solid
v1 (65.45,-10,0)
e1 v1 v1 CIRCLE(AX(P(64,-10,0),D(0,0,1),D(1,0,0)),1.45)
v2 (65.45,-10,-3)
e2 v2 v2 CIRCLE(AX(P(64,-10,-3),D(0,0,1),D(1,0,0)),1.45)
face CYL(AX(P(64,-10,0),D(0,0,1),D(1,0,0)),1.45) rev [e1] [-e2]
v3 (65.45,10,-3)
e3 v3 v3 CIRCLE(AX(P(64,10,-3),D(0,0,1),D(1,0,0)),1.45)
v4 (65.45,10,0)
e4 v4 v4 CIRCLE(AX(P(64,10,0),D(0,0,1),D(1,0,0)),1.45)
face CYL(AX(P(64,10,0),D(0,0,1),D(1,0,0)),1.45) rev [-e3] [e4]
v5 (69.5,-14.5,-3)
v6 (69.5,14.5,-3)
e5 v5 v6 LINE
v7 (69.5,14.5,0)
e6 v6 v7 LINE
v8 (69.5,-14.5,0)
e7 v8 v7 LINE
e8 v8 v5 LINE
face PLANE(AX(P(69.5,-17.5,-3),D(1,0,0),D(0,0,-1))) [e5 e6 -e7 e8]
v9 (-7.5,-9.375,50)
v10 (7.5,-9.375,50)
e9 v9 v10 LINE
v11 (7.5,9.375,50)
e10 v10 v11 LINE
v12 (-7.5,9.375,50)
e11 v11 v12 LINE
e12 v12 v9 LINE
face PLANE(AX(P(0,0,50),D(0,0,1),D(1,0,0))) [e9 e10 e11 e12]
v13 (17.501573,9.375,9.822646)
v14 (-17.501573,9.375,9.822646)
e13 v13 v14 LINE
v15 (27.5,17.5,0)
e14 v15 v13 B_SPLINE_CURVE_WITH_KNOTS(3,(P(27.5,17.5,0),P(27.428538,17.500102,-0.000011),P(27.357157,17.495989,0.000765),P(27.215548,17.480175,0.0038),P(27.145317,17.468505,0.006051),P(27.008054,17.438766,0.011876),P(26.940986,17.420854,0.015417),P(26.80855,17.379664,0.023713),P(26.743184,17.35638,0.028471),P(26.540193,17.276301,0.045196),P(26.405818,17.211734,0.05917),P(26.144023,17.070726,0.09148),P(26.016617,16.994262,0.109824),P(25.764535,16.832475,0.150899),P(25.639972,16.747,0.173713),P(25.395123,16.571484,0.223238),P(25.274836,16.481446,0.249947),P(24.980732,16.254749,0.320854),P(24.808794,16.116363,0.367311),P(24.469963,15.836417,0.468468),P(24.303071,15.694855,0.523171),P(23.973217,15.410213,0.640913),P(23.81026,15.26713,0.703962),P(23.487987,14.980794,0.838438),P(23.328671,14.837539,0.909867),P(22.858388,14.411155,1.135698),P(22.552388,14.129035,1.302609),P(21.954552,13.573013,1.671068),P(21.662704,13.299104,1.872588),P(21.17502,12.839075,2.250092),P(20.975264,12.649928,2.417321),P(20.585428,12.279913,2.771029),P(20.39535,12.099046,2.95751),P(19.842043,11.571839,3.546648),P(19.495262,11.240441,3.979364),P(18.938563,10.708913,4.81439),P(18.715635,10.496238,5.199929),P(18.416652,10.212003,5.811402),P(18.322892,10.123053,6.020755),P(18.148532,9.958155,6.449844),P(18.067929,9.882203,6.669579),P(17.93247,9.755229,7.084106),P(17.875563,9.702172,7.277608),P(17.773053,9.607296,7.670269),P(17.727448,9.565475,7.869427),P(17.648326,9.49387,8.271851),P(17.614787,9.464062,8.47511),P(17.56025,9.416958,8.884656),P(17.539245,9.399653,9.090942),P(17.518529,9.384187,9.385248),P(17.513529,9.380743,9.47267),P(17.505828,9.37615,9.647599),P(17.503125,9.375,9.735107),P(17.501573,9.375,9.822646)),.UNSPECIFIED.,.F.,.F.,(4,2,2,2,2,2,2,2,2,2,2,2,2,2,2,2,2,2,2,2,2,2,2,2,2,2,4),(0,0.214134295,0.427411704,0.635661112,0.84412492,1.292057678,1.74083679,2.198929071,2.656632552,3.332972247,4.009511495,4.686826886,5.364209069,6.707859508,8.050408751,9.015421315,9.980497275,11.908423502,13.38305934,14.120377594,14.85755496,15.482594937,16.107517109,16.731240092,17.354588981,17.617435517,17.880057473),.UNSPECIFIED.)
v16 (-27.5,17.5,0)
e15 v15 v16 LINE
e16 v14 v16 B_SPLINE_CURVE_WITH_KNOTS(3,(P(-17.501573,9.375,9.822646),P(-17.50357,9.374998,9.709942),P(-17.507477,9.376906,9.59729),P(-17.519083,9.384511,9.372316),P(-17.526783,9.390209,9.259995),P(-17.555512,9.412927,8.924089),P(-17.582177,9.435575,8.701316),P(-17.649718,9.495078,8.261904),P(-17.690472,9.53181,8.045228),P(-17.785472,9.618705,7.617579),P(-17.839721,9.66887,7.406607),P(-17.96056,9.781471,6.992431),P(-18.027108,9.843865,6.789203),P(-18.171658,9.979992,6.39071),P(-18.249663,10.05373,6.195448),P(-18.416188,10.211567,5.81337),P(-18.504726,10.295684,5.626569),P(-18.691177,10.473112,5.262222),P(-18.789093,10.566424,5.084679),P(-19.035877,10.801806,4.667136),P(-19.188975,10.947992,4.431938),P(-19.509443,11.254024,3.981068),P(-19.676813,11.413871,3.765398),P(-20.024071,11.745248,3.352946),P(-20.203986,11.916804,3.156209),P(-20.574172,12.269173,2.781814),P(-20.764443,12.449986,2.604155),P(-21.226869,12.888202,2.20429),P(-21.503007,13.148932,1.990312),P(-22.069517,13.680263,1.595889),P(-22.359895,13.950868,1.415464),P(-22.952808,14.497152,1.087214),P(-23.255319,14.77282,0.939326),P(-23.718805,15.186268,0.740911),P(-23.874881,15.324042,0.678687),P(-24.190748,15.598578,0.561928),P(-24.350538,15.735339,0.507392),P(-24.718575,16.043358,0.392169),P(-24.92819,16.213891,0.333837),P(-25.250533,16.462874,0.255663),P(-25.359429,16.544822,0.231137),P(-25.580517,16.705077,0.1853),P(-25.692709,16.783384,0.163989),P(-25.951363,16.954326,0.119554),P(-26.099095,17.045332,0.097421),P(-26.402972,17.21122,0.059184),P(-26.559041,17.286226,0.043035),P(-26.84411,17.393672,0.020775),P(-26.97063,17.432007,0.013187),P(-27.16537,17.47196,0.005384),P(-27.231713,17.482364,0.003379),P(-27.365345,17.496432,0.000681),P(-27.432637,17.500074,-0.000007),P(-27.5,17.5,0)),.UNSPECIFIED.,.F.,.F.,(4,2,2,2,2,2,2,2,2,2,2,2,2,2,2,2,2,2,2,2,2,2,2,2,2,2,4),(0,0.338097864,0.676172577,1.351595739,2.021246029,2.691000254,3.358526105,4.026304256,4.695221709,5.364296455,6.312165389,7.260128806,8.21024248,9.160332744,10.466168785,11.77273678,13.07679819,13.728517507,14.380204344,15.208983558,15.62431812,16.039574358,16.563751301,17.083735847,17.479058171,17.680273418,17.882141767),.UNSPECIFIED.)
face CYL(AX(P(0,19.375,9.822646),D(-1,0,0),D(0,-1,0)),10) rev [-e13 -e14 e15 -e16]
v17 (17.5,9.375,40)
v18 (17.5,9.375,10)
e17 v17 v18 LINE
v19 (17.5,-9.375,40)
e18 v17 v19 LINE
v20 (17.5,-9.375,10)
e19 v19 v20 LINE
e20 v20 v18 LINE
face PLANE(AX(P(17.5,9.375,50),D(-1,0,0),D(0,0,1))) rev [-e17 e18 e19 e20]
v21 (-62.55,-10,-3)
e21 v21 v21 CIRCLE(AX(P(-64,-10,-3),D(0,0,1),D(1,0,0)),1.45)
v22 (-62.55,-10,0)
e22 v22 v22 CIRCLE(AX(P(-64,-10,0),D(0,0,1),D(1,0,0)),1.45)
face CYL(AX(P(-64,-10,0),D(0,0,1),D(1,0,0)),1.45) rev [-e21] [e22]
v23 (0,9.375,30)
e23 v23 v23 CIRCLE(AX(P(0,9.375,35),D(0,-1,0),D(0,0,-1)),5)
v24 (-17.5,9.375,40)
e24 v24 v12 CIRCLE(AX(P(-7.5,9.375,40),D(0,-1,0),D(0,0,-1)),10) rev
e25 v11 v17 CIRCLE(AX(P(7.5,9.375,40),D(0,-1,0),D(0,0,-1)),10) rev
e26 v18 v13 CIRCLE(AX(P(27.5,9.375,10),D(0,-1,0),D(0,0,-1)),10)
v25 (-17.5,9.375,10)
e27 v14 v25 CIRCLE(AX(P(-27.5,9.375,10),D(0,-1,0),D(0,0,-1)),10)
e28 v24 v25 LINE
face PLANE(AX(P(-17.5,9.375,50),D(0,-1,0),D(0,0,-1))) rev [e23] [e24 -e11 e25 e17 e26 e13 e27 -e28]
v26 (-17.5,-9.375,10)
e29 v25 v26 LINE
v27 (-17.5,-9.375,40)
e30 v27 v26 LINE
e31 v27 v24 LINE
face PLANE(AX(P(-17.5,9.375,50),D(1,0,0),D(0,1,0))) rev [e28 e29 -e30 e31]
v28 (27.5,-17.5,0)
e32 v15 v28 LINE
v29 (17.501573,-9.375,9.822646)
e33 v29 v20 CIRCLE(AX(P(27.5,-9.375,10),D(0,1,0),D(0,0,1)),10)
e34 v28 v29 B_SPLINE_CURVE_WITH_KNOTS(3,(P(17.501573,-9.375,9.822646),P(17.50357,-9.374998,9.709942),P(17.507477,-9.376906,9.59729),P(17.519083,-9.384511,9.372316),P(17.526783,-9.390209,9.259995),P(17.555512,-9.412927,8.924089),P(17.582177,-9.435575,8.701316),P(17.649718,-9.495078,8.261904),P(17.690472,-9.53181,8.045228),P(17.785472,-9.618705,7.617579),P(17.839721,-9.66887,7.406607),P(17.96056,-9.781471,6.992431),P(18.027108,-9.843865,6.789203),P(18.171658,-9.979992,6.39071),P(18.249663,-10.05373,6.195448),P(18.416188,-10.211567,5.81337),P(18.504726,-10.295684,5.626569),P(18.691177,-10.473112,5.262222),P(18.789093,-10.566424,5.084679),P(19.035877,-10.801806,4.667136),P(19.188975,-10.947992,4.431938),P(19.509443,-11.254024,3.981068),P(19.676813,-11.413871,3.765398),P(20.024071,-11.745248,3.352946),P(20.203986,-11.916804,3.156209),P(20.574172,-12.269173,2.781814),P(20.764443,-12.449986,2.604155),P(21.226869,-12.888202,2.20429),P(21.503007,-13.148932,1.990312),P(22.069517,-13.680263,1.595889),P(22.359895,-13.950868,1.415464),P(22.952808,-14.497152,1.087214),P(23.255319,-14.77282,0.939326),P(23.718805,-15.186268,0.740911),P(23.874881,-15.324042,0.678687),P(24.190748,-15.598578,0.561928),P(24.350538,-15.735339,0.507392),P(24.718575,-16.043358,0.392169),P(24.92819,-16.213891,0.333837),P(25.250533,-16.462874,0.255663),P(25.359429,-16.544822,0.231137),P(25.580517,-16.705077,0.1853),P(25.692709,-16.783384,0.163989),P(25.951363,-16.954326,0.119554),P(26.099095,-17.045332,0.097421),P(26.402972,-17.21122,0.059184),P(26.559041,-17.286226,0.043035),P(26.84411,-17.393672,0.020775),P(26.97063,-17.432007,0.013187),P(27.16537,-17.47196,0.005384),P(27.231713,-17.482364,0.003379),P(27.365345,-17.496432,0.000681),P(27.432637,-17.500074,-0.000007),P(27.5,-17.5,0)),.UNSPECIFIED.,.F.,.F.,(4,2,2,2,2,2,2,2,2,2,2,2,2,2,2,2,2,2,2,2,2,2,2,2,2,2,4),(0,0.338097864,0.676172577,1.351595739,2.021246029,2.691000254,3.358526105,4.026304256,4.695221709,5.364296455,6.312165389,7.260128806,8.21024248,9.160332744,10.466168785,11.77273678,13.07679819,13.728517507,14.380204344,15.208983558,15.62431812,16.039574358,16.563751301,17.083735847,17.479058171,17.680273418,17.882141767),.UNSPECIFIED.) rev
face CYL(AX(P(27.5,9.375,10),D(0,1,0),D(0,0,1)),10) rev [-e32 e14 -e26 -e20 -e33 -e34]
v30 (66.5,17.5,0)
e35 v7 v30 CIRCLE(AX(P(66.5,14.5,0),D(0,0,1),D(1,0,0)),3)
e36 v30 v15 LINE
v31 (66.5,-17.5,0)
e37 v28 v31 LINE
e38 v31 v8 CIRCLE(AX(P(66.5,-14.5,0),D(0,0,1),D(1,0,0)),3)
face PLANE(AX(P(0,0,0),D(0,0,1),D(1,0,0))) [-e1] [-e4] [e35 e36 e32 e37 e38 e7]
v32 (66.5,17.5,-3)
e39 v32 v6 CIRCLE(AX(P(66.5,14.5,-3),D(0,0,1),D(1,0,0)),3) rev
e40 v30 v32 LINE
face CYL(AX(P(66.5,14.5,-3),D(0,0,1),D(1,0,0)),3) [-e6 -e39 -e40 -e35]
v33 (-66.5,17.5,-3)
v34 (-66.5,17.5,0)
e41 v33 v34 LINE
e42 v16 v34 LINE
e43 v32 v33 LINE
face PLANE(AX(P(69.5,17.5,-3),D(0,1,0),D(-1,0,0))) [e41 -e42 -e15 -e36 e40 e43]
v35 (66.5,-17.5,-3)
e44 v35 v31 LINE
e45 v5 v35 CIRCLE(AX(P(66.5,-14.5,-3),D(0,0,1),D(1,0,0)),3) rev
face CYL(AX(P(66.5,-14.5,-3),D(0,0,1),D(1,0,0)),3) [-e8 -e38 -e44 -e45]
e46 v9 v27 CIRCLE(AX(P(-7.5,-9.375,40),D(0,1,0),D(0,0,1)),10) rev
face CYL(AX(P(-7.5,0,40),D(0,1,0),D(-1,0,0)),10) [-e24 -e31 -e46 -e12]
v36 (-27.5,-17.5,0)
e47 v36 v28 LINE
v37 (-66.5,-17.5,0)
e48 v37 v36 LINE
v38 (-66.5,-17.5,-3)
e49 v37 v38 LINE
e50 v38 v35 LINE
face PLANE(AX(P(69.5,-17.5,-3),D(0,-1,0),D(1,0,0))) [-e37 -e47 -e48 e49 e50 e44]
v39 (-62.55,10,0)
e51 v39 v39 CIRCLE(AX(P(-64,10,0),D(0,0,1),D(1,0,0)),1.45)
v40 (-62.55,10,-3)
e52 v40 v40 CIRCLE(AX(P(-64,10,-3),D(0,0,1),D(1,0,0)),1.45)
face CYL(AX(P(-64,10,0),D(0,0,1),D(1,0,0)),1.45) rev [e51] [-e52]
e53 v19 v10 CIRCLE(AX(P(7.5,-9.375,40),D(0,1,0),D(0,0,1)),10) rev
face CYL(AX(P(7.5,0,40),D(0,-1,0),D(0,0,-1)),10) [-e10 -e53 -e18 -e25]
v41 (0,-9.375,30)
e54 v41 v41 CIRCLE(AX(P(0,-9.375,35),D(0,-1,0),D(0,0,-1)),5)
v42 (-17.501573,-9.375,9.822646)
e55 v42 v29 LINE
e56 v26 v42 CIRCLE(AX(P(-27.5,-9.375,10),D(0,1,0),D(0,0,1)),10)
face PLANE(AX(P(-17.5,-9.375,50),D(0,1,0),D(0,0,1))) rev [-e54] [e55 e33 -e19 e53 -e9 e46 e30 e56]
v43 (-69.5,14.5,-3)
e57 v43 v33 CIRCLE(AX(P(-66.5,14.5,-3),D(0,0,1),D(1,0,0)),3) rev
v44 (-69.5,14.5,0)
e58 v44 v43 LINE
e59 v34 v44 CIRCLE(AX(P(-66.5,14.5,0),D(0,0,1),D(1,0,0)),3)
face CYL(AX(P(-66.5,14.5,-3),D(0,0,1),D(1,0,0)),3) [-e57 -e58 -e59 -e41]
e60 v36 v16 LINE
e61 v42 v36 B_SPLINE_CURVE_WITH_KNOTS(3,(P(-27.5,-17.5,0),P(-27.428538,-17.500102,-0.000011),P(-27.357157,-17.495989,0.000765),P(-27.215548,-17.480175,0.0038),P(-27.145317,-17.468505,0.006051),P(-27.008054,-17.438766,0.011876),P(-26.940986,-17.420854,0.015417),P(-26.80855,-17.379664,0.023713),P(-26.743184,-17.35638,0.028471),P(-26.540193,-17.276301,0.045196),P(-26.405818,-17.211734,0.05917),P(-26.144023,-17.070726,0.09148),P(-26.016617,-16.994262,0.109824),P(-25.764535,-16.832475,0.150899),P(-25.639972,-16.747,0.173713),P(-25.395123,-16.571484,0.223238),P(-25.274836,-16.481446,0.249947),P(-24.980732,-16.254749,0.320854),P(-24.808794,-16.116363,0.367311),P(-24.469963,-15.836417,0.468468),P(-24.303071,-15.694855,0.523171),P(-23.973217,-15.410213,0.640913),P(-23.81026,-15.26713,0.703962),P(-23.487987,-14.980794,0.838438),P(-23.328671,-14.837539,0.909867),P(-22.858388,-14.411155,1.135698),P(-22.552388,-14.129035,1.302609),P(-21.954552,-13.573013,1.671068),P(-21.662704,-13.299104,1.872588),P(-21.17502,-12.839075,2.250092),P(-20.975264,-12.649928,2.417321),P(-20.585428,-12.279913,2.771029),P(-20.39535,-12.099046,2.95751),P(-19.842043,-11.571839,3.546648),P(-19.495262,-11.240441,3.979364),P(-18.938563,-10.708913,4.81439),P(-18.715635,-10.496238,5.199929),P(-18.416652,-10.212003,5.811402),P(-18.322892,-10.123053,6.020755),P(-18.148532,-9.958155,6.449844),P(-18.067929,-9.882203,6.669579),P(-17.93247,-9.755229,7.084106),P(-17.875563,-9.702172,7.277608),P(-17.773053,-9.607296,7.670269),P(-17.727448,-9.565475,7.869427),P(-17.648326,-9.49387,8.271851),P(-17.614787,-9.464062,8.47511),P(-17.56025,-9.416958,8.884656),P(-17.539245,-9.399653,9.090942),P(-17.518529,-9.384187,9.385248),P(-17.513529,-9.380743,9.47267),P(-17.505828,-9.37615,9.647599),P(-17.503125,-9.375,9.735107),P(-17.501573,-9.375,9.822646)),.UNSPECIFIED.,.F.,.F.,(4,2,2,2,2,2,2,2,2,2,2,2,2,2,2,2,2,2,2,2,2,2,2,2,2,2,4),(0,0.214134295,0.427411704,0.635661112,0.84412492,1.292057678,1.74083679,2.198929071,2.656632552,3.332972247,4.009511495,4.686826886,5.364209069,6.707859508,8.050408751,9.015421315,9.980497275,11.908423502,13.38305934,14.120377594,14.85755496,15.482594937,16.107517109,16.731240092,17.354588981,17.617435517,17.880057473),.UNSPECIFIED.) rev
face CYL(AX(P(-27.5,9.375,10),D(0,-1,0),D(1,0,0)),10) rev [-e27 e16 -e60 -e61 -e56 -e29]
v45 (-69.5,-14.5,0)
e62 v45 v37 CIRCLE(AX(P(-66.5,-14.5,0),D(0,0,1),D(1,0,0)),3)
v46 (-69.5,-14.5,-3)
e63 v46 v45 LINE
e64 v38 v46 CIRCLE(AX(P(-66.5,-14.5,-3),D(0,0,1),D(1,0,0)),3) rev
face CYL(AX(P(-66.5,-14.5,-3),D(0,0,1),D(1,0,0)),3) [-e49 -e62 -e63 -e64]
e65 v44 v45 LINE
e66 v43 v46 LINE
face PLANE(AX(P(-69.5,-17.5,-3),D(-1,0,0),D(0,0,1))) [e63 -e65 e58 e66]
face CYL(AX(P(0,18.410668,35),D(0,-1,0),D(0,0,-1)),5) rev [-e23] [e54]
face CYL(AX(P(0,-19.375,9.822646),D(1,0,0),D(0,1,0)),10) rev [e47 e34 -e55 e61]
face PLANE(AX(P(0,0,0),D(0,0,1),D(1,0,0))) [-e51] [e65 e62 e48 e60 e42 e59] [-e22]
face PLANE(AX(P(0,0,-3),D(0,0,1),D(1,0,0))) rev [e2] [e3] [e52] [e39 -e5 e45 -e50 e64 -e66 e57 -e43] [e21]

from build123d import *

# Parameters (mm, degrees)
ESQUISSE7_W             = 139
ESQUISSE7_H             = 35
BOSS_EXTRU_1_DEPTH      = 3
ESQUISSE8_W             = 35
ESQUISSE8_H             = 18.75
BOSS_EXTRU_2_DEPTH      = 50
CONG_1_R                = 10
D_GAGEMENT_M2_52_D      = 2.9
ESQUISSE9_R             = 5
ENL_V_MAT_EXTRU_2_DEPTH = 90.73581019
CONG_2_R                = 3


with BuildPart() as part:
    # Esquisse7 → Boss.-Extru.1 (new body)
    with BuildSketch(Plane.XY):
        Rectangle(ESQUISSE7_W, ESQUISSE7_H)
    extrude(amount=-BOSS_EXTRU_1_DEPTH)

    # Esquisse8 → Boss.-Extru.2 (add)
    with BuildSketch(Plane.XY):
        Rectangle(ESQUISSE8_W, ESQUISSE8_H)
    extrude(amount=BOSS_EXTRU_2_DEPTH)

    # Congé1
    # the kernel refuses this fillet: 10 mm, written as the material it adds along each edge
    with BuildSketch(Plane(origin=(17.5, 9.375, 0), x_dir=(1, 0, 0), z_dir=(0, -1, 0)), Plane(origin=(-17.5, -9.375, 0), x_dir=(-1, 0, 0), z_dir=(0, 1, 0))) as cong_1_piece_1:
        with BuildLine():
            CenterArc((CONG_1_R, CONG_1_R), CONG_1_R, 180, 90)
            Line((0, CONG_1_R), (0, 0))
            Line((0, 0), (CONG_1_R, 0))
        make_face()
    extrude(amount=18.75)
    with BuildSketch(Plane(origin=(-17.5, 9.375, 0), x_dir=(0, 1, 0), z_dir=(1, 0, 0)), Plane(origin=(17.5, -9.375, 0), x_dir=(0, -1, 0), z_dir=(-1, 0, 0))) as cong_1_piece_2:
        with BuildLine():
            CenterArc((10, 9.822646028), CONG_1_R, 180, 79.193077125)
            Line((0, 9.822646028), (0, 0))
            Line((0, 0), (8.125, 0))
        make_face()
    extrude(amount=35)
    with BuildSketch(Plane(origin=(-17.5, 9.375, 0), x_dir=(0, 1, 0), z_dir=(1, 0, 0))) as cong_1_piece_3a_section:
        with BuildLine():
            CenterArc((10, 9.822646028), CONG_1_R, 180, 79.193077125)
            Line((0, 9.822646028), (0, 0))
            Line((0, 0), (8.125, 0))
        make_face()
    cong_1_piece_3a = extrude(amount=59.556615071, mode=Mode.PRIVATE)
    cong_1_piece_3a = split(cong_1_piece_3a, bisect_by=Plane(origin=(17.5, 9.375, 0), z_dir=(1, 0, 0)), keep=Keep.TOP, mode=Mode.PRIVATE)
    with BuildSketch(Plane(origin=(17.5, 34.375, 0), x_dir=(1, 0, 0), z_dir=(0, -1, 0))) as cong_1_piece_3b_section:
        with BuildLine():
            CenterArc((CONG_1_R, CONG_1_R), CONG_1_R, 180, 90)
            Line((0, CONG_1_R), (0, 0))
            Line((0, 0), (CONG_1_R, 0))
        make_face()
    cong_1_piece_3b = extrude(amount=43.75, mode=Mode.PRIVATE)
    cong_1_piece_3b = split(cong_1_piece_3b, bisect_by=Plane(origin=(17.5, 17.5, 0), z_dir=(0, -1, 0)), keep=Keep.TOP, mode=Mode.PRIVATE)
    cong_1_piece_3b = split(cong_1_piece_3b, bisect_by=Plane(origin=(17.5, 9.375, 0), z_dir=(0, 1, 0)), keep=Keep.TOP, mode=Mode.PRIVATE)
    cong_1_piece_3 = cong_1_piece_3a & cong_1_piece_3b
    add(cong_1_piece_3)
    with BuildSketch(Plane(origin=(17.5, 9.375, 0), x_dir=(1, 0, 0), z_dir=(0, -1, 0))) as cong_1_piece_4a_section:
        with BuildLine():
            CenterArc((CONG_1_R, CONG_1_R), CONG_1_R, 180, 90)
            Line((0, CONG_1_R), (0, 0))
            Line((0, 0), (CONG_1_R, 0))
        make_face()
    cong_1_piece_4a = extrude(amount=43.75, mode=Mode.PRIVATE)
    cong_1_piece_4a = split(cong_1_piece_4a, bisect_by=Plane(origin=(17.5, -17.5, 0), z_dir=(0, 1, 0)), keep=Keep.TOP, mode=Mode.PRIVATE)
    cong_1_piece_4a = split(cong_1_piece_4a, bisect_by=Plane(origin=(17.5, -9.375, 0), z_dir=(0, -1, 0)), keep=Keep.TOP, mode=Mode.PRIVATE)
    with BuildSketch(Plane(origin=(42.056615071, -9.375, 0), x_dir=(0, -1, 0), z_dir=(-1, 0, 0))) as cong_1_piece_4b_section:
        with BuildLine():
            CenterArc((10, 9.822646028), CONG_1_R, 180, 79.193077125)
            Line((0, 9.822646028), (0, 0))
            Line((0, 0), (8.125, 0))
        make_face()
    cong_1_piece_4b = extrude(amount=59.556615071, mode=Mode.PRIVATE)
    cong_1_piece_4b = split(cong_1_piece_4b, bisect_by=Plane(origin=(17.5, -9.375, 0), z_dir=(1, 0, 0)), keep=Keep.TOP, mode=Mode.PRIVATE)
    cong_1_piece_4 = cong_1_piece_4a & cong_1_piece_4b
    add(cong_1_piece_4)
    with BuildSketch(Plane(origin=(-42.056615071, 9.375, 0), x_dir=(0, 1, 0), z_dir=(1, 0, 0))) as cong_1_piece_5a_section:
        with BuildLine():
            CenterArc((10, 9.822646028), CONG_1_R, 180, 79.193077125)
            Line((0, 9.822646028), (0, 0))
            Line((0, 0), (8.125, 0))
        make_face()
    cong_1_piece_5a = extrude(amount=59.556615071, mode=Mode.PRIVATE)
    cong_1_piece_5a = split(cong_1_piece_5a, bisect_by=Plane(origin=(-17.5, 9.375, 0), z_dir=(-1, 0, 0)), keep=Keep.TOP, mode=Mode.PRIVATE)
    with BuildSketch(Plane(origin=(-17.5, -9.375, 0), x_dir=(-1, 0, 0), z_dir=(0, 1, 0))) as cong_1_piece_5b_section:
        with BuildLine():
            CenterArc((CONG_1_R, CONG_1_R), CONG_1_R, 180, 90)
            Line((0, CONG_1_R), (0, 0))
            Line((0, 0), (CONG_1_R, 0))
        make_face()
    cong_1_piece_5b = extrude(amount=43.75, mode=Mode.PRIVATE)
    cong_1_piece_5b = split(cong_1_piece_5b, bisect_by=Plane(origin=(-17.5, 17.5, 0), z_dir=(0, -1, 0)), keep=Keep.TOP, mode=Mode.PRIVATE)
    cong_1_piece_5b = split(cong_1_piece_5b, bisect_by=Plane(origin=(-17.5, 9.375, 0), z_dir=(0, 1, 0)), keep=Keep.TOP, mode=Mode.PRIVATE)
    cong_1_piece_5 = cong_1_piece_5a & cong_1_piece_5b
    add(cong_1_piece_5)
    with BuildSketch(Plane(origin=(17.5, -9.375, 0), x_dir=(0, -1, 0), z_dir=(-1, 0, 0))) as cong_1_piece_6a_section:
        with BuildLine():
            CenterArc((10, 9.822646028), CONG_1_R, 180, 79.193077125)
            Line((0, 9.822646028), (0, 0))
            Line((0, 0), (8.125, 0))
        make_face()
    cong_1_piece_6a = extrude(amount=59.556615071, mode=Mode.PRIVATE)
    cong_1_piece_6a = split(cong_1_piece_6a, bisect_by=Plane(origin=(-17.5, -9.375, 0), z_dir=(-1, 0, 0)), keep=Keep.TOP, mode=Mode.PRIVATE)
    with BuildSketch(Plane(origin=(-17.5, -34.375, 0), x_dir=(-1, 0, 0), z_dir=(0, 1, 0))) as cong_1_piece_6b_section:
        with BuildLine():
            CenterArc((CONG_1_R, CONG_1_R), CONG_1_R, 180, 90)
            Line((0, CONG_1_R), (0, 0))
            Line((0, 0), (CONG_1_R, 0))
        make_face()
    cong_1_piece_6b = extrude(amount=43.75, mode=Mode.PRIVATE)
    cong_1_piece_6b = split(cong_1_piece_6b, bisect_by=Plane(origin=(-17.5, -17.5, 0), z_dir=(0, 1, 0)), keep=Keep.TOP, mode=Mode.PRIVATE)
    cong_1_piece_6b = split(cong_1_piece_6b, bisect_by=Plane(origin=(-17.5, -9.375, 0), z_dir=(0, -1, 0)), keep=Keep.TOP, mode=Mode.PRIVATE)
    cong_1_piece_6 = cong_1_piece_6a & cong_1_piece_6b
    add(cong_1_piece_6)
    # the kernel refuses this fillet: 10 mm, written as the material it takes off along each edge
    with BuildSketch(Plane(origin=(17.5, 34.375, 50), x_dir=(-1, 0, 0), z_dir=(0, -1, 0))) as cong_1_2_piece_1:
        with BuildLine():
            CenterArc((CONG_1_R, CONG_1_R), CONG_1_R, 180, 90)
            Line((0, CONG_1_R), (0, 0))
            Line((0, 0), (CONG_1_R, 0))
        make_face()
    extrude(amount=68.75, mode=Mode.SUBTRACT)
    with BuildSketch(Plane(origin=(-17.5, -34.375, 50), x_dir=(0, 0, -1), z_dir=(0, 1, 0))) as cong_1_2_piece_2:
        with BuildLine():
            CenterArc((CONG_1_R, -CONG_1_R), CONG_1_R, 90, 90)
            Line((0, -CONG_1_R), (0, 0))
            Line((0, 0), (CONG_1_R, 0))
        make_face()
    extrude(amount=68.75, mode=Mode.SUBTRACT)

    # Dégagement M2.52 (through all)
    with Locations(Plane.XY):
        with Locations((64, -10), (64, 10), (-64, -10), (-64, 10)):
            Hole(D_GAGEMENT_M2_52_D / 2)

    # Esquisse9 → Enlèv. mat.-Extru.2 (cut, through all)
    with BuildSketch(Plane(origin=(0, -9.375, 0), x_dir=(-1, 0, 0), z_dir=(0, -1, 0))):
        with Locations(Location((0, -35, 0), (0, 0, 90))):
            Circle(ESQUISSE9_R)
    extrude(amount=-ENL_V_MAT_EXTRU_2_DEPTH, mode=Mode.SUBTRACT)

    # Congé2
    cong_2_edges = [part.edges().sort_by_distance(p)[0] for p in [
        (-69.5, 17.5, -1.5),
        (69.5, 17.5, -1.5),
        (69.5, -17.5, -1.5),
        (-69.5, -17.5, -1.5),
    ]]
    fillet(cong_2_edges, radius=CONG_2_R)


solid = part.part
